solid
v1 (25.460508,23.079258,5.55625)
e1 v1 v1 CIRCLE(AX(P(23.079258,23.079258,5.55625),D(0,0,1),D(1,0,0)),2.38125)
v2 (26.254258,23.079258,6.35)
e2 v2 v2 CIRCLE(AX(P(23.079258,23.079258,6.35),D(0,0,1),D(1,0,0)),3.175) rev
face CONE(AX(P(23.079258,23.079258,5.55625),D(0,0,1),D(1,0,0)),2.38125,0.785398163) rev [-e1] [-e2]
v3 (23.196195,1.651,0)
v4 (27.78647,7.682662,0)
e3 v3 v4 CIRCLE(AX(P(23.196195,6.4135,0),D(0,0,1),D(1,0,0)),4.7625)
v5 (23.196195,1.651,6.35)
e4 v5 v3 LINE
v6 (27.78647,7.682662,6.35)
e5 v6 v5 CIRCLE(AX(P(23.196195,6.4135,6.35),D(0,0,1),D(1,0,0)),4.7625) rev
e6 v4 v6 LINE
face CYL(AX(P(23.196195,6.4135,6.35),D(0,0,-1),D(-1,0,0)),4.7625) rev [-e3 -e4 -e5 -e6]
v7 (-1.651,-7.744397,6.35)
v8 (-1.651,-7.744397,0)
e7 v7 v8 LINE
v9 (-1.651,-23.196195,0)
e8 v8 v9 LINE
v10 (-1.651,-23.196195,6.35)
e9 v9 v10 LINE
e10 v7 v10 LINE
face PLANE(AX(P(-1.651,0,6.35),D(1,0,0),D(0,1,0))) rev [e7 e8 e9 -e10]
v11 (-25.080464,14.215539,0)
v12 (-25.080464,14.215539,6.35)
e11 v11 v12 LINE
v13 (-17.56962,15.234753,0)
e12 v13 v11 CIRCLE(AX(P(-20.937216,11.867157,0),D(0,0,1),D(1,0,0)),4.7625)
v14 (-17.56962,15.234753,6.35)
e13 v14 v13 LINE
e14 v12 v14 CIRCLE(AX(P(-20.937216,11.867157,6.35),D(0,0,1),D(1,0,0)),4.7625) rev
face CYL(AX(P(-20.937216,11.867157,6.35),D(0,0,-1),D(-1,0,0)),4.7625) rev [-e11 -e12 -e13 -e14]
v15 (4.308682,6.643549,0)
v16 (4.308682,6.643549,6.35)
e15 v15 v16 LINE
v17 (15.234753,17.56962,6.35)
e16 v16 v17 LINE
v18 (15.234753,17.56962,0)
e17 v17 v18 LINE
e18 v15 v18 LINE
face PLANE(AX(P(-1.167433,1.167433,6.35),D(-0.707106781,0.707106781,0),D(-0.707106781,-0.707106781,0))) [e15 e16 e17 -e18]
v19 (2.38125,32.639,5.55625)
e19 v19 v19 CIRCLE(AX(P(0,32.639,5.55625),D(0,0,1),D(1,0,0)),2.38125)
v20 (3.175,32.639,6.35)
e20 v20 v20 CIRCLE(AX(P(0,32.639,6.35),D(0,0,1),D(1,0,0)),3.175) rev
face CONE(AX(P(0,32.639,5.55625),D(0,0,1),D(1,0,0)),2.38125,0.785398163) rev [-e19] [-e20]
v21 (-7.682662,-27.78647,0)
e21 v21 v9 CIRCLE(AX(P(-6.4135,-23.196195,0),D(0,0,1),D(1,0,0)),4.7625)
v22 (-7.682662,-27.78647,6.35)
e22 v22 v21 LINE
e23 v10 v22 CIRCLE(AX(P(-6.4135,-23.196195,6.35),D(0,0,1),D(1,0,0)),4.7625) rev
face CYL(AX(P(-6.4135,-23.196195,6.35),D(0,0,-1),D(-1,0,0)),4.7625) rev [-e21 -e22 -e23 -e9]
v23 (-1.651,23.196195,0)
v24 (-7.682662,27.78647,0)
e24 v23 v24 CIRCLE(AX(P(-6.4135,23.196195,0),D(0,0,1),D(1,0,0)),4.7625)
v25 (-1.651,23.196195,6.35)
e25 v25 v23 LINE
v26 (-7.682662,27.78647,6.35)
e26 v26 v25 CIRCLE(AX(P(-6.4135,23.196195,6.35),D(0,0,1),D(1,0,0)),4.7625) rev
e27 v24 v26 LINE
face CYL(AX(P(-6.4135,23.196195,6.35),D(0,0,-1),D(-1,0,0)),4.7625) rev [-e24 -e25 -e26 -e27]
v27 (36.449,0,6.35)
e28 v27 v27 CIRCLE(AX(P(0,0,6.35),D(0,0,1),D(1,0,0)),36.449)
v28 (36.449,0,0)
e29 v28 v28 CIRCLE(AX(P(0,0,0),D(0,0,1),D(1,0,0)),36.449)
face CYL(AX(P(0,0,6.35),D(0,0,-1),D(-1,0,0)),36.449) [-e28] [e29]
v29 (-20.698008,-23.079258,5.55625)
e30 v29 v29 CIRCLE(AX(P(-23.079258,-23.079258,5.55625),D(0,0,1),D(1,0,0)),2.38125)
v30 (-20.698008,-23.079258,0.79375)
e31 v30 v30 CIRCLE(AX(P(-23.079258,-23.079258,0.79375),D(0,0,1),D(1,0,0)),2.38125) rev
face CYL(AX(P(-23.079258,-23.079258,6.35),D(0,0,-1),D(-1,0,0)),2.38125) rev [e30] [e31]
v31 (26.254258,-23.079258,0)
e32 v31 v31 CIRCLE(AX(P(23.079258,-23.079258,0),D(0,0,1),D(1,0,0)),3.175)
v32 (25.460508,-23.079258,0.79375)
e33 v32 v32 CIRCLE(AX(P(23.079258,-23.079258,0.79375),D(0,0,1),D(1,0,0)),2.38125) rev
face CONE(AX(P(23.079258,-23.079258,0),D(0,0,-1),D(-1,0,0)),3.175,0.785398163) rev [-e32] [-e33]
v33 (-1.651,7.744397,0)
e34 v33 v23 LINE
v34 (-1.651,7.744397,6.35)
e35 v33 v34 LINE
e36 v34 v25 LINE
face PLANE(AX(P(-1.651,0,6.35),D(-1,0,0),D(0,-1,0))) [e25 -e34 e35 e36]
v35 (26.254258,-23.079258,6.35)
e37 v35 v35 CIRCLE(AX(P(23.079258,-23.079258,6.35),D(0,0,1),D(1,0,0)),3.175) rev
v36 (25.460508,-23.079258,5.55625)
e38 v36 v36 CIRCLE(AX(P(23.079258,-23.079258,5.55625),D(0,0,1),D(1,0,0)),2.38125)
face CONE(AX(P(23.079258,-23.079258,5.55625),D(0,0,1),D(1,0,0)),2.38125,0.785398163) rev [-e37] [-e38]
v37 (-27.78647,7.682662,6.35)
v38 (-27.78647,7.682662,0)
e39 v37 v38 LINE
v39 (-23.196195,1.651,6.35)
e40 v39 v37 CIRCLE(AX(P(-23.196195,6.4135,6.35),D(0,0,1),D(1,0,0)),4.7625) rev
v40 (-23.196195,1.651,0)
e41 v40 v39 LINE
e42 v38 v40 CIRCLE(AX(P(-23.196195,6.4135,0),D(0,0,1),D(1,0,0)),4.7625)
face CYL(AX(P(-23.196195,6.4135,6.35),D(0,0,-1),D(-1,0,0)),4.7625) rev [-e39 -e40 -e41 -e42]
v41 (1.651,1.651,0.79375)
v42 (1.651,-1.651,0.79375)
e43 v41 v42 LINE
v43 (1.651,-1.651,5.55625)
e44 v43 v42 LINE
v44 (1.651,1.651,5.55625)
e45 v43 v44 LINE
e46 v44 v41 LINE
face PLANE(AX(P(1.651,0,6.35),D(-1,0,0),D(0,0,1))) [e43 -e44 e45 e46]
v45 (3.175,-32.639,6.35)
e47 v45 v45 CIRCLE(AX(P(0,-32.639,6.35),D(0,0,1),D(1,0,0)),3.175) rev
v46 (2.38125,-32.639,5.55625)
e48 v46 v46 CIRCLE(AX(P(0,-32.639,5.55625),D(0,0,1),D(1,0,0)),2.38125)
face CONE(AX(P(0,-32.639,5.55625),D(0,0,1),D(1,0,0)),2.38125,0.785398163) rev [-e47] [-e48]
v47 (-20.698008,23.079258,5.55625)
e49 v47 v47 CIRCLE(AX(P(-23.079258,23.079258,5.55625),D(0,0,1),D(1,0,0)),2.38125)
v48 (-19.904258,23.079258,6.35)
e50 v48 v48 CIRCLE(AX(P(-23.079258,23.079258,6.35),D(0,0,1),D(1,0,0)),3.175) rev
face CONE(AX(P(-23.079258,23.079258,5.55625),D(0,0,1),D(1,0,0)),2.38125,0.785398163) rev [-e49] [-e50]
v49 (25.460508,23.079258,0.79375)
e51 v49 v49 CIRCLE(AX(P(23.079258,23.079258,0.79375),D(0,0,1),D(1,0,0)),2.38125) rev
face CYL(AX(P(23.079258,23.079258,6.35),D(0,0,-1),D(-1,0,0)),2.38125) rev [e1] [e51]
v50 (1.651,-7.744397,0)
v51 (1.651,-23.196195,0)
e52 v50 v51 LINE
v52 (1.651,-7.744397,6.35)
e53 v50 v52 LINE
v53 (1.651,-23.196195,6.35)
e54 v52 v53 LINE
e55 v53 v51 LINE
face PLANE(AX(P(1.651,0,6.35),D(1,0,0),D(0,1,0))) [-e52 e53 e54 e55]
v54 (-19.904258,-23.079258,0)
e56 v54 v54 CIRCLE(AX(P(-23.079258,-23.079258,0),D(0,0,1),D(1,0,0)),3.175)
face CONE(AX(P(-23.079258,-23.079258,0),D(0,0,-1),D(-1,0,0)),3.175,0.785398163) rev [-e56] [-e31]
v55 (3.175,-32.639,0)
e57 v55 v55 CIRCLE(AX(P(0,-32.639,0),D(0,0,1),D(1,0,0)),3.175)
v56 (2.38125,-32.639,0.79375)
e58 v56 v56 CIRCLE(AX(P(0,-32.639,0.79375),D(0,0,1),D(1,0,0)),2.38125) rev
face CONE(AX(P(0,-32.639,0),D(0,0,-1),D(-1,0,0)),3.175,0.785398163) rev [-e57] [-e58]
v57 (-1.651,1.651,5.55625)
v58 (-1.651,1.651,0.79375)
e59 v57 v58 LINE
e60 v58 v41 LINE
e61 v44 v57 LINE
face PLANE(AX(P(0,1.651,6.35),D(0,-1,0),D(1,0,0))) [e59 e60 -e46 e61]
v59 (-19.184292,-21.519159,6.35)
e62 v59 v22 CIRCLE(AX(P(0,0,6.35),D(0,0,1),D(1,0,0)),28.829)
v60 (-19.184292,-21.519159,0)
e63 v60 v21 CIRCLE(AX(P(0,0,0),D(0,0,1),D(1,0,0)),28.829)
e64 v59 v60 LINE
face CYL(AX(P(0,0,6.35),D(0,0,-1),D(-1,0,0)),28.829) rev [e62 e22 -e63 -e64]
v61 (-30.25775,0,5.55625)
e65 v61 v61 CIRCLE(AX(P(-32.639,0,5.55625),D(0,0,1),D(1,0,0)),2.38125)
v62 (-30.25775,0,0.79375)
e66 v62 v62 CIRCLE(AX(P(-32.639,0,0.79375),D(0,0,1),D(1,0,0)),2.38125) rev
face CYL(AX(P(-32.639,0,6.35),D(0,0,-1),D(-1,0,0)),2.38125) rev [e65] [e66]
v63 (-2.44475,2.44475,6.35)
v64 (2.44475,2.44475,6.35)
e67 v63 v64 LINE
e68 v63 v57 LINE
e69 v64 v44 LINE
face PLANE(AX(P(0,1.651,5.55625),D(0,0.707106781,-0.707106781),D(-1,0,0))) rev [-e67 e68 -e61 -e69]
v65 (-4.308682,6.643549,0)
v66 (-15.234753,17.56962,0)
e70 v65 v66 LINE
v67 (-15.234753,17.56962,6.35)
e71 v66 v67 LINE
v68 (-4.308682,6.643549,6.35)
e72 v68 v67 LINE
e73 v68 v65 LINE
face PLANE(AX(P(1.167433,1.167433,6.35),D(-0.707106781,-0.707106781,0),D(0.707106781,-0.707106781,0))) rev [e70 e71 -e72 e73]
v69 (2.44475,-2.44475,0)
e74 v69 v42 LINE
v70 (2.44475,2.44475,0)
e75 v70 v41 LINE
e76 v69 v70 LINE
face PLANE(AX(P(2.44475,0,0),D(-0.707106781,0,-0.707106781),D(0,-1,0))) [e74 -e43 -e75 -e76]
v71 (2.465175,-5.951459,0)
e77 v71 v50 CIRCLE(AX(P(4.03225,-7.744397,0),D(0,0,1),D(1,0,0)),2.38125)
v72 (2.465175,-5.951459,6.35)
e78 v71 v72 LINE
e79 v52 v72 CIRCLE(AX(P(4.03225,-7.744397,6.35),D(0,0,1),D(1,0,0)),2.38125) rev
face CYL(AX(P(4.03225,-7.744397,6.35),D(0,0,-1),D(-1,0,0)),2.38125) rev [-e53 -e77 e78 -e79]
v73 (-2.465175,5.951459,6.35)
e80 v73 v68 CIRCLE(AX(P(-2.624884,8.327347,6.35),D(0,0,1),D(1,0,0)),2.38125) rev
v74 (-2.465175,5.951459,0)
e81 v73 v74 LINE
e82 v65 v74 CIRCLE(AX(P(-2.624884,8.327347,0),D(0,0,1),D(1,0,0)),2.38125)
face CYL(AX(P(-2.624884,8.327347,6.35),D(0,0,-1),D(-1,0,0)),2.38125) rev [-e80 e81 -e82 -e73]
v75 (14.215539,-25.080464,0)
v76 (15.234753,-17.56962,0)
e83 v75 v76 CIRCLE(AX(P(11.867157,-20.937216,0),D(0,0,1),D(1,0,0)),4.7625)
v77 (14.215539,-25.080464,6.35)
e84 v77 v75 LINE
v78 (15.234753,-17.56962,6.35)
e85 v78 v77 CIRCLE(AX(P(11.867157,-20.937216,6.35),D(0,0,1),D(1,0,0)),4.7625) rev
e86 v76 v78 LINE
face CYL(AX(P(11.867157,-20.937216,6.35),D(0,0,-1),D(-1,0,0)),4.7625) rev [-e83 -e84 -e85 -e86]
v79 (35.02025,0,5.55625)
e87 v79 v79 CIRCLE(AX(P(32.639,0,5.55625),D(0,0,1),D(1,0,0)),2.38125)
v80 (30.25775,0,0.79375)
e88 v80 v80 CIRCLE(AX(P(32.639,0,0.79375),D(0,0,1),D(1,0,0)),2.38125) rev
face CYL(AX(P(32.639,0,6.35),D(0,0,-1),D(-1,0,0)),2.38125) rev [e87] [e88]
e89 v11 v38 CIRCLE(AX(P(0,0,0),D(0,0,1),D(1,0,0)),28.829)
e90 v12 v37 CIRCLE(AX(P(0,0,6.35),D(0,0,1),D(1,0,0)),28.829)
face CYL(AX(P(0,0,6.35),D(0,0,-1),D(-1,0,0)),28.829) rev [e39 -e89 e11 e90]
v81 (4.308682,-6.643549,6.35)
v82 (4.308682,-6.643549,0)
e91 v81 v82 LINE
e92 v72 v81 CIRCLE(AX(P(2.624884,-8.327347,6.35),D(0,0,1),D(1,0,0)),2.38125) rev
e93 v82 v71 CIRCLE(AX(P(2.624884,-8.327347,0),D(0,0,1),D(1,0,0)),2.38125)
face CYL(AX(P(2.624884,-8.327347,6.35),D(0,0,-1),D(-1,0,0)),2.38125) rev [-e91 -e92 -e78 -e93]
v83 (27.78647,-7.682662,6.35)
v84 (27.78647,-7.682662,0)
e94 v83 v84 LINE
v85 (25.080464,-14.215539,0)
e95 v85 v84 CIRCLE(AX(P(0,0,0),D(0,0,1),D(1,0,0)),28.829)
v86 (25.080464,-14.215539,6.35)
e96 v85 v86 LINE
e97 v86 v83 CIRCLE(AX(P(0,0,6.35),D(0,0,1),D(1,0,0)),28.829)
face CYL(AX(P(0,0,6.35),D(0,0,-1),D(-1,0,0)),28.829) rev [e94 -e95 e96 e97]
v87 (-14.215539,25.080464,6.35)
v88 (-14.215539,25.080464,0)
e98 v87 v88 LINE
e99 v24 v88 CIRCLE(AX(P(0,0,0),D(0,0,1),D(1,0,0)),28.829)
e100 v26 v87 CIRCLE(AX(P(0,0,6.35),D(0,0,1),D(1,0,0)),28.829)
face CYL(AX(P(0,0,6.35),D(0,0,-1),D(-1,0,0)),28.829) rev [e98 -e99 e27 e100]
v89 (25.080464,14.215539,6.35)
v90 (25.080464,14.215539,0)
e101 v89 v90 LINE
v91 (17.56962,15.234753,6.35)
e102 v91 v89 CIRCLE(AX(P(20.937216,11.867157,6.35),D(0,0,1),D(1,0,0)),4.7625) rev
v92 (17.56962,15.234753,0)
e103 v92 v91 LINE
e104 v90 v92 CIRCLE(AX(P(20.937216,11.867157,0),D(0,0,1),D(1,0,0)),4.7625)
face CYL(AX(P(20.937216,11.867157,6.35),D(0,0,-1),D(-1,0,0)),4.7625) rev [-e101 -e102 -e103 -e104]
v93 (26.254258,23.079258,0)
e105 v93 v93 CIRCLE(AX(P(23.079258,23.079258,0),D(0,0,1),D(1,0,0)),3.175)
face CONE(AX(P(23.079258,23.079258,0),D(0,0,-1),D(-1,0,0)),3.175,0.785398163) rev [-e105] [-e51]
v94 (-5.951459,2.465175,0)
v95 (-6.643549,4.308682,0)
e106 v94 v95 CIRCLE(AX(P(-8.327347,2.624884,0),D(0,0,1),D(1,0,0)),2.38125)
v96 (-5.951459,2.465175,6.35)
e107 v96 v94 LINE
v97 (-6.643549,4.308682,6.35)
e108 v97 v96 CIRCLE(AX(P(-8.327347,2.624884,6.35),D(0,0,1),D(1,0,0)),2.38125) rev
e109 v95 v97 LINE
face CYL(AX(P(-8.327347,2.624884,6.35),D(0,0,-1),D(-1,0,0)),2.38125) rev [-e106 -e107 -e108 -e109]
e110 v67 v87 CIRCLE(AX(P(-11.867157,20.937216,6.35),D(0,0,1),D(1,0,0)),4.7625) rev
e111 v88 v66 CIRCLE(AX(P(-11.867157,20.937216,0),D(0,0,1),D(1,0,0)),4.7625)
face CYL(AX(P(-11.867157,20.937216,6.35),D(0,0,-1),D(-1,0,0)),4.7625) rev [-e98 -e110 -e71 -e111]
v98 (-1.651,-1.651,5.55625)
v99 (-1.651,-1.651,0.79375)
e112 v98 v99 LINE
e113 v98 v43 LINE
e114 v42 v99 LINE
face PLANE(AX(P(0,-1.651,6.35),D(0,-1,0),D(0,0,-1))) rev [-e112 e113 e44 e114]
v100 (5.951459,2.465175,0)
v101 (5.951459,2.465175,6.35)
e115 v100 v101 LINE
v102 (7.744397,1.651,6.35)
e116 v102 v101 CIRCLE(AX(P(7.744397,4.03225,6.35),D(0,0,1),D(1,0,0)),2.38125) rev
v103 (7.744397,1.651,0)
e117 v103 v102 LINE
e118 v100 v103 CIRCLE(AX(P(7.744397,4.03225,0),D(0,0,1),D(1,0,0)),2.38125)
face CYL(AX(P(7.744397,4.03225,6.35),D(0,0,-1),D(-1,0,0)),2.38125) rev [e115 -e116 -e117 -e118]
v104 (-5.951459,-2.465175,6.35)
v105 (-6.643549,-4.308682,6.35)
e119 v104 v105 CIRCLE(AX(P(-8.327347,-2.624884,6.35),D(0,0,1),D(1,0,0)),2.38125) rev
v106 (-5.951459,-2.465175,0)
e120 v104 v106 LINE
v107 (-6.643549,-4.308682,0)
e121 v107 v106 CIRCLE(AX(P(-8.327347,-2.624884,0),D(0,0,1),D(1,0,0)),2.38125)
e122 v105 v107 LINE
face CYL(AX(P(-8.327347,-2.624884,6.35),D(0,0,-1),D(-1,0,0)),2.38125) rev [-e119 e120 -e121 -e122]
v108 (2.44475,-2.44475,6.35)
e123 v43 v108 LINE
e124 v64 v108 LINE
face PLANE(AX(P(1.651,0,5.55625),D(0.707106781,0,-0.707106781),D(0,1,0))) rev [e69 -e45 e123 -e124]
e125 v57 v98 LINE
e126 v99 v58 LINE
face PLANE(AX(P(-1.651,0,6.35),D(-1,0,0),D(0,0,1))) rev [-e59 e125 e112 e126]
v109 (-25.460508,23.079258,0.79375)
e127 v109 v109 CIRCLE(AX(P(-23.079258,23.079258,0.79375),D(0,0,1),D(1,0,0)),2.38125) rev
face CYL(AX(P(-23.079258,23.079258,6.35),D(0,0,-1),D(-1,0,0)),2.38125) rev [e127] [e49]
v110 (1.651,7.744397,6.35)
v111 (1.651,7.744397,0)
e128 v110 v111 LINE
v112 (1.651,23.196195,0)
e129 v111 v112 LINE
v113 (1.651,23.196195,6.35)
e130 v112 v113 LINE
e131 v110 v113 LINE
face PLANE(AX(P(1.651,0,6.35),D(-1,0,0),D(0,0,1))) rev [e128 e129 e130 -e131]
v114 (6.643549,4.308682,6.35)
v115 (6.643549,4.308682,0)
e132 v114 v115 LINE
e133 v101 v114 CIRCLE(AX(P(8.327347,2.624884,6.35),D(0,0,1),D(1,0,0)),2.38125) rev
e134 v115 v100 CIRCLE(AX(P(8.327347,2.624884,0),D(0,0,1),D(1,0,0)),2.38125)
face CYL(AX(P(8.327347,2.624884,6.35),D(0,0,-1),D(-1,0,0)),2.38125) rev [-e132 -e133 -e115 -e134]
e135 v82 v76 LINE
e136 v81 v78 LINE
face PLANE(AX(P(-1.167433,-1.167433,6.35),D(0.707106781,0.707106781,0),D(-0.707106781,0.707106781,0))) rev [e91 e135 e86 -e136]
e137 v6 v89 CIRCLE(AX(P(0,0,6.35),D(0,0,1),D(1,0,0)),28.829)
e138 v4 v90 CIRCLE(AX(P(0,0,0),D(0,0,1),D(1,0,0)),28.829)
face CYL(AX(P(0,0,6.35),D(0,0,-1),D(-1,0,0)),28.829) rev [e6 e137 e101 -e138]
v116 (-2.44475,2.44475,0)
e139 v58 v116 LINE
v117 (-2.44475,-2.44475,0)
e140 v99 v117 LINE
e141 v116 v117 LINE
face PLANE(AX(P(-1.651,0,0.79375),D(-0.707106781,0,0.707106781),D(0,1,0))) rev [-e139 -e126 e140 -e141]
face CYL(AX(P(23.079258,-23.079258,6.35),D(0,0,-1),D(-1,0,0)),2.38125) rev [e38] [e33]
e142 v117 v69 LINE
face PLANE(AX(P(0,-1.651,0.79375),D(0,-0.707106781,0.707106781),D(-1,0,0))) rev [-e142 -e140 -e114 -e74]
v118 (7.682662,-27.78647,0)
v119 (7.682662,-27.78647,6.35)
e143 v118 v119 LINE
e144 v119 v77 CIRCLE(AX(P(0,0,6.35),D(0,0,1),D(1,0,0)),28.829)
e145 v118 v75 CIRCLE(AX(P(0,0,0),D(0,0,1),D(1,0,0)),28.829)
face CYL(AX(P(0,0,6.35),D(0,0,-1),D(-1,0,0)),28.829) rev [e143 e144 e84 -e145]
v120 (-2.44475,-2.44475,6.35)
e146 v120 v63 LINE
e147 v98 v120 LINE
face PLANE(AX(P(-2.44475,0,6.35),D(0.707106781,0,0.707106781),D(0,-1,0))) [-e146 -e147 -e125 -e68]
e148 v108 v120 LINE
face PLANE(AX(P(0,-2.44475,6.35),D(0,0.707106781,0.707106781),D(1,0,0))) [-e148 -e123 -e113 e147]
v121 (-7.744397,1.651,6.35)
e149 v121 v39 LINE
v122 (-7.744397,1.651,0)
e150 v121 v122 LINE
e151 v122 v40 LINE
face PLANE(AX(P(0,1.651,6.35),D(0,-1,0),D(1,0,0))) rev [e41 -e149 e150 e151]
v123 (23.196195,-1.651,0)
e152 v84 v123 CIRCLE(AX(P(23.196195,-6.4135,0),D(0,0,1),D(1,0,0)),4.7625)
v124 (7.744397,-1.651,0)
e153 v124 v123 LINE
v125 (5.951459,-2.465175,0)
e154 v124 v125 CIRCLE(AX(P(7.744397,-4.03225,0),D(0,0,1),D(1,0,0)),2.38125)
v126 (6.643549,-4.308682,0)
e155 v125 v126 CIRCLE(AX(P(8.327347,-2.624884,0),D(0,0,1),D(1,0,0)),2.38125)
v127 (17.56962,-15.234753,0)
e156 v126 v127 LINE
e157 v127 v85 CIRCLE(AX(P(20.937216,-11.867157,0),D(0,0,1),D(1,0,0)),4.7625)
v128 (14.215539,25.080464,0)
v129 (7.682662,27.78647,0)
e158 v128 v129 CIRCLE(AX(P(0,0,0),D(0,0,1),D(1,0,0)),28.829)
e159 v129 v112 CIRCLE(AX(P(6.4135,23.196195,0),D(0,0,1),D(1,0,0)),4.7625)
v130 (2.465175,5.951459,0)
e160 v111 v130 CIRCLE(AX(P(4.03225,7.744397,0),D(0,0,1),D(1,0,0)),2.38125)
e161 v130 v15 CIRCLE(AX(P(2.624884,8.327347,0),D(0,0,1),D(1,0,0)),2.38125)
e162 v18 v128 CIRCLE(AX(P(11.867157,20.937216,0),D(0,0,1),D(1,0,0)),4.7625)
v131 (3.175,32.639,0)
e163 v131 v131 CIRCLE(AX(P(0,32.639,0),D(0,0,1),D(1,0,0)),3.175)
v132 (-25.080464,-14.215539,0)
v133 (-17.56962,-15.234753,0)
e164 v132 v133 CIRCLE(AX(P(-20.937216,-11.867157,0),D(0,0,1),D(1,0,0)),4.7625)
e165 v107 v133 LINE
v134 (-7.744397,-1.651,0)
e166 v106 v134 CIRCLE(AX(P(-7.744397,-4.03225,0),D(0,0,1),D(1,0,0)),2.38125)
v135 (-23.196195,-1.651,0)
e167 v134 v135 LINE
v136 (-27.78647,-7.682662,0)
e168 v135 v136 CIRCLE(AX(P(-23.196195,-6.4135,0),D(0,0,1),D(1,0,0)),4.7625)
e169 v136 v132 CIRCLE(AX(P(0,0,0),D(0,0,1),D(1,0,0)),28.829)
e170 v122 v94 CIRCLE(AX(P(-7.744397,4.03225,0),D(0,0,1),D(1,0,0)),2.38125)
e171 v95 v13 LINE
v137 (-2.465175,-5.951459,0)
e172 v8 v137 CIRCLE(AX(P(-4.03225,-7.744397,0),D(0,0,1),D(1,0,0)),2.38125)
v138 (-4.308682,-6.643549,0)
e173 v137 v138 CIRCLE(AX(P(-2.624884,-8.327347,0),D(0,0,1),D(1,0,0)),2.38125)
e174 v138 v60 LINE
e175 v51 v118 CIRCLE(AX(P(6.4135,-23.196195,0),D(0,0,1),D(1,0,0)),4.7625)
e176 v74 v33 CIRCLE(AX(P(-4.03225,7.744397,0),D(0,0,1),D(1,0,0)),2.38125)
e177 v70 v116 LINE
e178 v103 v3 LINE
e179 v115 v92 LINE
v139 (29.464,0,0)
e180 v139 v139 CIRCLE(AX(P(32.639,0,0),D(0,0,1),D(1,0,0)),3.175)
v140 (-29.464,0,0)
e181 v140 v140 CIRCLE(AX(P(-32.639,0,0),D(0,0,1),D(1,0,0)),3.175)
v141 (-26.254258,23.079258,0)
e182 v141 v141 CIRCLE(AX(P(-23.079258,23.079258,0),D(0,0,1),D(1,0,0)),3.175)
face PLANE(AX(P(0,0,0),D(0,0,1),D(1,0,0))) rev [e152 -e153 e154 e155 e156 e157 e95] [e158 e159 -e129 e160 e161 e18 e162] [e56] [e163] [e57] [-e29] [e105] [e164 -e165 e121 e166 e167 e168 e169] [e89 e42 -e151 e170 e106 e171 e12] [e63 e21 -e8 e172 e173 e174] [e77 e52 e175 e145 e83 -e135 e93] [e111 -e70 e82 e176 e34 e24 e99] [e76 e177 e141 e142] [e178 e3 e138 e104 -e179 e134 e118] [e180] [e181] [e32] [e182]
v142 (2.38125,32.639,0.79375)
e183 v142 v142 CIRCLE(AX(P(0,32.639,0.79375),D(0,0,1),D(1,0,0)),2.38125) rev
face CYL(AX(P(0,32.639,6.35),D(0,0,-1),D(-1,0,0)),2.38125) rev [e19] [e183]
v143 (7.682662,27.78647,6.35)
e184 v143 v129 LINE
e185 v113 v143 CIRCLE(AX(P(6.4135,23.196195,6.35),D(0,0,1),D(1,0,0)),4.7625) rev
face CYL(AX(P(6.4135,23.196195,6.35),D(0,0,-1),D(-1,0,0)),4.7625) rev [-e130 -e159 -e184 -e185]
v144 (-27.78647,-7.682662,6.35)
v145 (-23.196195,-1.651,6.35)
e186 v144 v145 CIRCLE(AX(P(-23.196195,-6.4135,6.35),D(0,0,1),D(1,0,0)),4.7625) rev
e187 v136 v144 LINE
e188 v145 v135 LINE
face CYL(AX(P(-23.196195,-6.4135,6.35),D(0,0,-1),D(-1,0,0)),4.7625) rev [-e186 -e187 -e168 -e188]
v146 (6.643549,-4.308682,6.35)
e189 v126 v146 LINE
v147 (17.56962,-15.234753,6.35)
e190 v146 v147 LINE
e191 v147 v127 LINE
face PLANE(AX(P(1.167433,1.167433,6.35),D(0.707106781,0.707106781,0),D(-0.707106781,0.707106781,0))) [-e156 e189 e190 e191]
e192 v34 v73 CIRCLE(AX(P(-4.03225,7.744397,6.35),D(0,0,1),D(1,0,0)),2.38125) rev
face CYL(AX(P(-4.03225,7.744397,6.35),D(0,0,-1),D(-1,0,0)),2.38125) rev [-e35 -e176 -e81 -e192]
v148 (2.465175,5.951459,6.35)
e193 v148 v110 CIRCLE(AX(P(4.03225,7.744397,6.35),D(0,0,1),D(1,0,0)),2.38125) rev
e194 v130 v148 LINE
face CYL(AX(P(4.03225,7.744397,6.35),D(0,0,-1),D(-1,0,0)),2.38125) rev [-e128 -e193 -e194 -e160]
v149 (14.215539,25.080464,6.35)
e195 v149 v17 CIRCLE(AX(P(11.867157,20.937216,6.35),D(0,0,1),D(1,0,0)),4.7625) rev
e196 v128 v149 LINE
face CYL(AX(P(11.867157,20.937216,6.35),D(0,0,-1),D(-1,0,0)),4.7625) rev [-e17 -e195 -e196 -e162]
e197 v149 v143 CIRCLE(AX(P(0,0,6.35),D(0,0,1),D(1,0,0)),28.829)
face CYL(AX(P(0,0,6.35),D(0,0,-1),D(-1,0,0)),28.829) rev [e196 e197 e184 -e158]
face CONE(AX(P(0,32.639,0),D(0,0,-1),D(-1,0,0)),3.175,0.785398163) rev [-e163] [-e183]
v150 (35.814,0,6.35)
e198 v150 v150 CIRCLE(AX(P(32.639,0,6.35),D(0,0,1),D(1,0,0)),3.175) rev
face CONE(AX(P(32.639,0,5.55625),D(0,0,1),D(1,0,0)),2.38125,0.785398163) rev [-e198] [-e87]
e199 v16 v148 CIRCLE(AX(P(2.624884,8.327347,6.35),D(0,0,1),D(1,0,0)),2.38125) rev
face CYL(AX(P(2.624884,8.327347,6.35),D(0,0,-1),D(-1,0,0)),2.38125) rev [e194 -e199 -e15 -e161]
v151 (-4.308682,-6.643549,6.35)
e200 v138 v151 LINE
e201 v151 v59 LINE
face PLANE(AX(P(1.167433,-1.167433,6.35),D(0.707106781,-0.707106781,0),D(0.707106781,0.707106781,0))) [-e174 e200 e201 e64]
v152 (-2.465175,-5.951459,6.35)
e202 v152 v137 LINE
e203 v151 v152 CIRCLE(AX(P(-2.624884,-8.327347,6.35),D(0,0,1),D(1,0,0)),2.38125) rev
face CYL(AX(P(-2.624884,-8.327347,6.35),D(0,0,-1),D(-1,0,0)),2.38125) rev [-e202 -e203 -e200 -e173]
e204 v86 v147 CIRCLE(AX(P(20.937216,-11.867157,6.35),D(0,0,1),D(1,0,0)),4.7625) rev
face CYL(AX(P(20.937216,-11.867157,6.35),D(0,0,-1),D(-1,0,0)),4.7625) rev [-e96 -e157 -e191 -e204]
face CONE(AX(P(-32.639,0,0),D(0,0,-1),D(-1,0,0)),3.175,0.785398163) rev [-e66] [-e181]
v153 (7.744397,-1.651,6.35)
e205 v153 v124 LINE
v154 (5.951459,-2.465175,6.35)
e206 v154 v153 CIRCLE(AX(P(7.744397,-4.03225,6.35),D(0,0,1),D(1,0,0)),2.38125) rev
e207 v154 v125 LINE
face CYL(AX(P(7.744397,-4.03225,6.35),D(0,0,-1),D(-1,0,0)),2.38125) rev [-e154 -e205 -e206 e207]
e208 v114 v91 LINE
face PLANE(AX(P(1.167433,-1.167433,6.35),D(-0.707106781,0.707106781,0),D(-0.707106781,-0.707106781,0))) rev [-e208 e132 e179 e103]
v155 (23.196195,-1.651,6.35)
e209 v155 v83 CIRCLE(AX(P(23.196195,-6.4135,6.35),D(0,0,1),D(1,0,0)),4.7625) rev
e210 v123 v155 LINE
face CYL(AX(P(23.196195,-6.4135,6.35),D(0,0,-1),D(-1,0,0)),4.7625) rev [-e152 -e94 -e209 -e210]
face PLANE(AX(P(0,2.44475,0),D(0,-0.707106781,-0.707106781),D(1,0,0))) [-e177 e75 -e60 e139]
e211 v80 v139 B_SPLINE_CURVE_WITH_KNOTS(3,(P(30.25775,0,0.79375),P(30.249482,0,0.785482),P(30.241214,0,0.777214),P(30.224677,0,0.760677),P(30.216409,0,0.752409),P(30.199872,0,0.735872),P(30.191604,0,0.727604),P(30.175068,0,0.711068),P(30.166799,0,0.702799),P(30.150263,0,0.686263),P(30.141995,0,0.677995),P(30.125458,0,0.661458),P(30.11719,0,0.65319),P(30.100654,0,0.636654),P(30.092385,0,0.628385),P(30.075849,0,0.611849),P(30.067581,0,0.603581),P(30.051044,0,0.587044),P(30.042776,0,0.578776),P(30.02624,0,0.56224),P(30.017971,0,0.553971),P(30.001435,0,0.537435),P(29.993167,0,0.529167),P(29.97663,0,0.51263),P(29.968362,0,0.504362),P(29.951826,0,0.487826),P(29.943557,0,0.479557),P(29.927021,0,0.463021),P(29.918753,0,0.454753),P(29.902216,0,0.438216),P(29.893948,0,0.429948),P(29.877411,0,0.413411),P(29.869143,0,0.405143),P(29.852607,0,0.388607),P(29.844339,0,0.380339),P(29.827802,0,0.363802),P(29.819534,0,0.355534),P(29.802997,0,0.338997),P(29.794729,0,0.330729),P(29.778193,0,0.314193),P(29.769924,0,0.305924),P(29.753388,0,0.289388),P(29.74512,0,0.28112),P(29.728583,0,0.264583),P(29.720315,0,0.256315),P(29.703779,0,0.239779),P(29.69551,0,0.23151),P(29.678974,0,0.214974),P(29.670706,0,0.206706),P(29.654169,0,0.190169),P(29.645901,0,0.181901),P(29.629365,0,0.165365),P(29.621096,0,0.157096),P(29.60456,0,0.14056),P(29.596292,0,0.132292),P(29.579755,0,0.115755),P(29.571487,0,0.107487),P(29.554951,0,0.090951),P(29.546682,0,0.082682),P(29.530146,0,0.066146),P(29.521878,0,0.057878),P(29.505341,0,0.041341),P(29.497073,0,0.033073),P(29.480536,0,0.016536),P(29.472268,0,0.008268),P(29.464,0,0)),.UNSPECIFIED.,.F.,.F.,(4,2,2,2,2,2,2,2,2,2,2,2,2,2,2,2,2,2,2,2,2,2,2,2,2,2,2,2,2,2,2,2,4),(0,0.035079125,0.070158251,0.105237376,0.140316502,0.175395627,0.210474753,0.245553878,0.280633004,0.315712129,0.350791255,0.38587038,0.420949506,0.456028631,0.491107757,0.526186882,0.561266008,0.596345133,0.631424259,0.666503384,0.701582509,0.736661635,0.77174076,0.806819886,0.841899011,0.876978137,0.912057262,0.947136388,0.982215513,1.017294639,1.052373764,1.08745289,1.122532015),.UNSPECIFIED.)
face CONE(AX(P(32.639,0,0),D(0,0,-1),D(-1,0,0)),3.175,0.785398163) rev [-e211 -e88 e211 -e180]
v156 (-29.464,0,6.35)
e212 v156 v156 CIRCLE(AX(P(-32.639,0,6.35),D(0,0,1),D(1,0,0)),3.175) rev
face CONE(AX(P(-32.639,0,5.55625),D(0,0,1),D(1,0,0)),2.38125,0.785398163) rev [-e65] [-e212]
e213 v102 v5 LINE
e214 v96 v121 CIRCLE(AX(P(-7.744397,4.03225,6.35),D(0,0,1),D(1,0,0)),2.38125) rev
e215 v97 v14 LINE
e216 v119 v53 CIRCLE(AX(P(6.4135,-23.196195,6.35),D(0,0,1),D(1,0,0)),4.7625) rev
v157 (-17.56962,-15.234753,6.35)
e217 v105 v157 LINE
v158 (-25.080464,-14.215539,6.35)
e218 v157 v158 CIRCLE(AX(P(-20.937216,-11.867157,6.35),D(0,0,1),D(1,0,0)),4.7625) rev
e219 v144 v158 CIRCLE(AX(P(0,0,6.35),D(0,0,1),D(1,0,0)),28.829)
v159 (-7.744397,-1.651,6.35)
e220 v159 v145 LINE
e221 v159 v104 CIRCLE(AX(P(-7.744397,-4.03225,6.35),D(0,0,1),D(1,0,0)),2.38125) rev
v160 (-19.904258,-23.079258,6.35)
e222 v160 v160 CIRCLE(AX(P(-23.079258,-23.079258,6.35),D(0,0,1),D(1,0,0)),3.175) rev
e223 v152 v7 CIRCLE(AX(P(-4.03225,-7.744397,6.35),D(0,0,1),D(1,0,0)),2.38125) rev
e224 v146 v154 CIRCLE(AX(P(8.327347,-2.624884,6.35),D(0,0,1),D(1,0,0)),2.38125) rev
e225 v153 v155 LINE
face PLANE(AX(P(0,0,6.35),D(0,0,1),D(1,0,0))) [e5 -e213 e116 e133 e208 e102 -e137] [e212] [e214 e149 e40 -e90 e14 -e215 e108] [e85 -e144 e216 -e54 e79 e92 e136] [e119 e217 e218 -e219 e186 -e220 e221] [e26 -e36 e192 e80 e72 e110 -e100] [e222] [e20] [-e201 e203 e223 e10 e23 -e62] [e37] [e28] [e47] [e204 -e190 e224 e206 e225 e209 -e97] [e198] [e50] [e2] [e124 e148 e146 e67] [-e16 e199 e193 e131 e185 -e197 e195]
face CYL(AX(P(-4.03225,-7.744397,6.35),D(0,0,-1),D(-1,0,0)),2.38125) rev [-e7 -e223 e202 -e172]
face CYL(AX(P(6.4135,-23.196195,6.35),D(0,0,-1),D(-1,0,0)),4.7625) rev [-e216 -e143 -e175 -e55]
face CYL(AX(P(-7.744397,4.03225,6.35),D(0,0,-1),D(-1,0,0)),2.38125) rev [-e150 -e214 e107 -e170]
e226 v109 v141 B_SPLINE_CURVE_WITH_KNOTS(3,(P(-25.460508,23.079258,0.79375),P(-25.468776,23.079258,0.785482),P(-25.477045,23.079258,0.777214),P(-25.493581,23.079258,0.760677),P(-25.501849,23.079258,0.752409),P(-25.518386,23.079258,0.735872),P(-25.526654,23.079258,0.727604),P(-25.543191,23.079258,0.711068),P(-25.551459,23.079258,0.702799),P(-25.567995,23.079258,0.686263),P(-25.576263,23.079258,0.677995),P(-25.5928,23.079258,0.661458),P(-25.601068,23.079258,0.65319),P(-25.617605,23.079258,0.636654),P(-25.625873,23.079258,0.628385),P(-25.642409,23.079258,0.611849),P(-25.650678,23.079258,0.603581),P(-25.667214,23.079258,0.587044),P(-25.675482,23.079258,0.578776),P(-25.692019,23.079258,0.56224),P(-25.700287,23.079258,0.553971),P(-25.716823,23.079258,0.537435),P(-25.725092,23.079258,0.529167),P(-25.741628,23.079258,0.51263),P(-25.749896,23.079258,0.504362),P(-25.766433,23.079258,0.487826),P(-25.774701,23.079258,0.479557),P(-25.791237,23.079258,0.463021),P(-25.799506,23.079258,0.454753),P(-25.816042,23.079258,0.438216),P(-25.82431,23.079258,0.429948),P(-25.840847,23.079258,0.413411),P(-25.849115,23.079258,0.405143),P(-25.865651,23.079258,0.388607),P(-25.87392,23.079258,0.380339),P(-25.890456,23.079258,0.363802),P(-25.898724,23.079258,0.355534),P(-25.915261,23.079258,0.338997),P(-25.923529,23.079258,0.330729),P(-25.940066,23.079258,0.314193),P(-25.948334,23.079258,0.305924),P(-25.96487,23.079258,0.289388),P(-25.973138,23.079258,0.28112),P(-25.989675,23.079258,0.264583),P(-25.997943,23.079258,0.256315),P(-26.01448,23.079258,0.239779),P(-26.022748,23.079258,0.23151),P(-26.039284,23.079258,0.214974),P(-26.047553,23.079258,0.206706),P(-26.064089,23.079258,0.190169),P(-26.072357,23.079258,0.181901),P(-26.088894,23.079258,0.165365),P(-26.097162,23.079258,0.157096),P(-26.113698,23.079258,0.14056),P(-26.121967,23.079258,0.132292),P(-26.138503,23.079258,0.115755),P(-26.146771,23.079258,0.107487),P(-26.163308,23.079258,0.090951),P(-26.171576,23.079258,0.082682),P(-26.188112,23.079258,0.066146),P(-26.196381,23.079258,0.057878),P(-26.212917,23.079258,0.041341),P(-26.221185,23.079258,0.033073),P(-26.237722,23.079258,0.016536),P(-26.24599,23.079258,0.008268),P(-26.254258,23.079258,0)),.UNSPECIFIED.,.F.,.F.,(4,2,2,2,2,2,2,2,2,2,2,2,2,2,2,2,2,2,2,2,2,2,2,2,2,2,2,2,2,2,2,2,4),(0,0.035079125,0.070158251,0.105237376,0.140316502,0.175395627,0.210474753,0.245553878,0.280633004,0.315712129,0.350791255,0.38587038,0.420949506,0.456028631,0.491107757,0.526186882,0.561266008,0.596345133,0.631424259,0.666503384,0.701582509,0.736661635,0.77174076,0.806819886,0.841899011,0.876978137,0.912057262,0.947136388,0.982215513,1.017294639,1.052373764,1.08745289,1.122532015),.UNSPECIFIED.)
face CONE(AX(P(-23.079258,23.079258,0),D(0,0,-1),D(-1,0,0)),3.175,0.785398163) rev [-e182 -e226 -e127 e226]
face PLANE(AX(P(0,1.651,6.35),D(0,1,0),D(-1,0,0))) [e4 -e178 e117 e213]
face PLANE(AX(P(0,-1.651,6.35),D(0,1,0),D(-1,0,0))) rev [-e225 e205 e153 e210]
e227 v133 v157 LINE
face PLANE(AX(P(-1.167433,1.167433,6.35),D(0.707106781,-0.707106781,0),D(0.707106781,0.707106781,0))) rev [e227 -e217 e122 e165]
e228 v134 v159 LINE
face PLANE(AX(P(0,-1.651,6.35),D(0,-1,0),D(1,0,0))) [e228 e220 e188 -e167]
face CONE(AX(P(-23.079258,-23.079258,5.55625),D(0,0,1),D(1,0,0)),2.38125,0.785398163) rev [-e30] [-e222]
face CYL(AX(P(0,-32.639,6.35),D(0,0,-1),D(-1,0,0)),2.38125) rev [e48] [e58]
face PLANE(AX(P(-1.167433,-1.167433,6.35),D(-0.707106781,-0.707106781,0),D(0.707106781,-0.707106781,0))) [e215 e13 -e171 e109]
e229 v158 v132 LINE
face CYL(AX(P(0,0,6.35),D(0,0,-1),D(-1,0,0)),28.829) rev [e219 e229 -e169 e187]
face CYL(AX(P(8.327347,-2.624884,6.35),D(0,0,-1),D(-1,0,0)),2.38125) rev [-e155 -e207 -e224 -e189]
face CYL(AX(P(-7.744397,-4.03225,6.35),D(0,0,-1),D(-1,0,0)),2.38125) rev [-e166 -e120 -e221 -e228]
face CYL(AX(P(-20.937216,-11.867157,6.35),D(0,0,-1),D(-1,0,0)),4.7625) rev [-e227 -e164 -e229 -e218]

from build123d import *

# Parameters (mm, degrees)
SKETCH1_R           = 36.449
SKETCH1_W           = 3.302
SKETCH1_H           = 3.302
SKETCH1_R_2         = 2.38125
BOSS_EXTRUDE1_DEPTH = 6.35
FILLET1_R           = 4.7625
FILLET2_R           = 2.38125
CHAMFER1_SIZE       = 0.79375


with BuildPart() as part:
    # Sketch1 → Boss-Extrude1 (new body)
    with BuildSketch(Plane.XY):
        Circle(SKETCH1_R)
        with BuildLine():
            Line((-1.651, 28.781685844), (-1.651, 6.131614714))
            ThreePointArc((-1.651, 6.131614714), (-2.430039796, 5.866635031), (-3.168273048, 5.50313964))
            Line((-3.168273048, 5.50313964), (-19.184291938, 21.51915853))
            ThreePointArc((-19.184291938, 21.51915853), (-11.032380672, 26.634523043), (-1.651, 28.781685844))
        make_face(mode=Mode.SUBTRACT)
        with BuildLine():
            Line((-21.51915853, 19.184291938), (-5.50313964, 3.168273048))
            ThreePointArc((-5.50313964, 3.168273048), (-5.866635031, 2.430039796), (-6.131614714, 1.651))
            Line((-6.131614714, 1.651), (-28.781685844, 1.651))
            ThreePointArc((-28.781685844, 1.651), (-26.634523043, 11.032380672), (-21.51915853, 19.184291938))
        make_face(mode=Mode.SUBTRACT)
        with BuildLine():
            Line((-28.781685844, -1.651), (-6.131614714, -1.651))
            ThreePointArc((-6.131614714, -1.651), (-5.866635031, -2.430039796), (-5.50313964, -3.168273048))
            Line((-5.50313964, -3.168273048), (-21.51915853, -19.184291938))
            ThreePointArc((-21.51915853, -19.184291938), (-26.634523043, -11.032380672), (-28.781685844, -1.651))
        make_face(mode=Mode.SUBTRACT)
        with BuildLine():
            Line((-19.184291938, -21.51915853), (-3.168273048, -5.50313964))
            ThreePointArc((-3.168273048, -5.50313964), (-2.430039796, -5.866635031), (-1.651, -6.131614714))
            Line((-1.651, -6.131614714), (-1.651, -28.781685844))
            ThreePointArc((-1.651, -28.781685844), (-11.032380672, -26.634523043), (-19.184291938, -21.51915853))
        make_face(mode=Mode.SUBTRACT)
        with BuildLine():
            Line((1.651, -28.781685844), (1.651, -6.131614714))
            ThreePointArc((1.651, -6.131614714), (2.430039796, -5.866635031), (3.168273048, -5.50313964))
            Line((3.168273048, -5.50313964), (19.184291938, -21.51915853))
            ThreePointArc((19.184291938, -21.51915853), (11.032380672, -26.634523043), (1.651, -28.781685844))
        make_face(mode=Mode.SUBTRACT)
        with BuildLine():
            Line((21.51915853, -19.184291938), (5.50313964, -3.168273048))
            ThreePointArc((5.50313964, -3.168273048), (5.866635031, -2.430039796), (6.131614714, -1.651))
            Line((6.131614714, -1.651), (28.781685844, -1.651))
            ThreePointArc((28.781685844, -1.651), (26.634523043, -11.032380672), (21.51915853, -19.184291938))
        make_face(mode=Mode.SUBTRACT)
        with BuildLine():
            Line((28.781685844, 1.651), (6.131614714, 1.651))
            ThreePointArc((6.131614714, 1.651), (5.866635031, 2.430039796), (5.50313964, 3.168273048))
            Line((5.50313964, 3.168273048), (21.51915853, 19.184291938))
            ThreePointArc((21.51915853, 19.184291938), (26.634523043, 11.032380672), (28.781685844, 1.651))
        make_face(mode=Mode.SUBTRACT)
        with BuildLine():
            Line((19.184291938, 21.51915853), (3.168273048, 5.50313964))
            ThreePointArc((3.168273048, 5.50313964), (2.430039796, 5.866635031), (1.651, 6.131614714))
            Line((1.651, 6.131614714), (1.651, 28.781685844))
            ThreePointArc((1.651, 28.781685844), (11.032380672, 26.634523043), (19.184291938, 21.51915853))
        make_face(mode=Mode.SUBTRACT)
        Rectangle(SKETCH1_W, SKETCH1_H, mode=Mode.SUBTRACT)
        with Locations((-23.079258231, -23.079258231)):
            Circle(SKETCH1_R_2, mode=Mode.SUBTRACT)
        with Locations((-32.639, 0)):
            Circle(SKETCH1_R_2, mode=Mode.SUBTRACT)
        with Locations((0, -32.639)):
            Circle(SKETCH1_R_2, mode=Mode.SUBTRACT)
        with Locations((23.079258231, -23.079258231)):
            Circle(SKETCH1_R_2, mode=Mode.SUBTRACT)
        with Locations((-23.079258231, 23.079258231)):
            Circle(SKETCH1_R_2, mode=Mode.SUBTRACT)
        with Locations((23.079258231, 23.079258231)):
            Circle(SKETCH1_R_2, mode=Mode.SUBTRACT)
        with Locations((0, 32.639)):
            Circle(SKETCH1_R_2, mode=Mode.SUBTRACT)
        with Locations((32.639, 0)):
            Circle(SKETCH1_R_2, mode=Mode.SUBTRACT)
    extrude(amount=BOSS_EXTRUDE1_DEPTH)

    # Fillet1
    fillet1_edges = [part.edges().sort_by_distance(p)[0] for p in [
        (21.51915853, 19.184291938, 3.175),
        (28.781685844, 1.651, 3.175),
        (19.184291938, 21.51915853, 3.175),
        (1.651, 28.781685844, 3.175),
        (-1.651, 28.781685844, 3.175),
        (-19.184291938, 21.51915853, 3.175),
        (-21.51915853, 19.184291938, 3.175),
        (-28.781685844, 1.651, 3.175),
        (-28.781685844, -1.651, 3.175),
        (-21.51915853, -19.184291938, 3.175),
        (-1.651, -28.781685844, 3.175),
        (1.651, -28.781685844, 3.175),
        (19.184291938, -21.51915853, 3.175),
        (21.51915853, -19.184291938, 3.175),
        (28.781685844, -1.651, 3.175),
    ]]
    fillet(fillet1_edges, radius=FILLET1_R)

    # Fillet2
    # the kernel refuses this fillet: 2.38125 mm, written as the material it adds along each edge
    with BuildSketch(Plane(origin=(6.131614714, -1.651, 0), x_dir=(-0.36304434778587014, -0.931771861316241, 0), z_dir=(0, 0, 1)), Plane(origin=(1.651, 6.131614714, 0), x_dir=(0.9317718613162208, -0.36304434778592154, 0), z_dir=(0, 0, 1)), Plane(origin=(5.50313964, 3.168273048, 0), x_dir=(0.40215108146465606, -0.9155733218463759, 0), z_dir=(0, 0, 1)), Plane(origin=(-6.131614714, 1.651, 0), x_dir=(0.3630443477859294, 0.9317718613162179, 0), z_dir=(0, 0, 1))) as fillet2_piece_1:
        with BuildLine():
            CenterArc((1.633270214, 2.367244602), FILLET2_R, 201.287277983, 62.495506179)
            Line((-0.585511531, 1.502745249), (0, 0))
            ThreePointArc((0, 0), (0.687692722, 0.037347727), (1.375385443, 0))
        make_face()
    extrude(amount=6.35)
    with BuildSketch(Plane(origin=(5.50313964, -3.168273048, 0), x_dir=(0.7071067811865454, -0.7071067811865497, 0), z_dir=(0, 0, 1)), Plane(origin=(3.168273048, 5.50313964, 0), x_dir=(0.7071067811865503, 0.7071067811865448, 0), z_dir=(0, 0, 1)), Plane(origin=(6.131614714, 1.651, 0), x_dir=(1, 0, 0), z_dir=(0, 0, 1)), Plane(origin=(-1.651, 6.131614714, 0), x_dir=(0, 1, 0), z_dir=(0, 0, 1)), Plane(origin=(-5.50313964, 3.168273048, 0), x_dir=(-0.7071067811865499, 0.7071067811865452, 0), z_dir=(0, 0, 1)), Plane(origin=(-6.131614714, -1.651, 0), x_dir=(-1, 0, 0), z_dir=(0, 0, 1)), Plane(origin=(1.651, -6.131614714, 0), x_dir=(0, -1, 0), z_dir=(0, 0, 1))) as fillet2_piece_2:
        with BuildLine():
            CenterArc((1.61278239, 2.38125), FILLET2_R, 207.504493821, 62.495506179)
            ThreePointArc((-0.499325911, 1.281545455), (-0.214863395, 0.654331608), (0, 0))
            Line((0, 0), (1.61278239, 0))
        make_face()
    extrude(amount=6.35)
    with BuildSketch(Plane(origin=(3.168273048, -5.50313964, 0), x_dir=(0.7071067811865439, -0.7071067811865511, 0), z_dir=(0, 0, 1)), Plane(origin=(-3.168273048, 5.50313964, 0), x_dir=(-0.7071067811865503, 0.7071067811865448, 0), z_dir=(0, 0, 1)), Plane(origin=(-5.50313964, -3.168273048, 0), x_dir=(-0.7071067811865455, -0.7071067811865496, 0), z_dir=(0, 0, 1)), Plane(origin=(-1.651, -6.131614714, 0), x_dir=(0, -1, 0), z_dir=(0, 0, 1))) as fillet2_piece_3:
        with BuildLine():
            CenterArc((1.61278239, -2.38125), FILLET2_R, 90, 62.495506179)
            ThreePointArc((-0.499325911, -1.281545455), (-0.214863395, -0.654331608), (0, 0))
            Line((0, 0), (1.61278239, 0))
        make_face()
    extrude(amount=6.35)
    with BuildSketch(Plane(origin=(-3.168273048, -5.50313964, 0), x_dir=(0.9155733218463795, -0.40215108146464806, 0), z_dir=(0, 0, 1))) as fillet2_piece_4:
        with BuildLine():
            CenterArc((1.633270214, -2.367244602), FILLET2_R, 96.217215838, 62.495506179)
            Line((-0.585511531, -1.502745249), (0, 0))
            ThreePointArc((0, 0), (0.687692722, -0.037347727), (1.375385443, 0))
        make_face()
    extrude(amount=6.35)

    # Chamfer1
    chamfer1_edges = [part.edges().sort_by_distance(p)[0] for p in [
        (-25.460508231, 23.079258231, 6.35),
        (-35.02025, 0, 6.35),
        (-25.460508231, -23.079258231, 6.35),
        (-2.38125, -32.639, 6.35),
        (20.698008231, -23.079258231, 6.35),
        (30.25775, 0, 6.35),
        (20.698008231, 23.079258231, 6.35),
        (-2.38125, 32.639, 6.35),
        (0, -1.651, 6.35),
        (-1.651, 0, 6.35),
        (0, 1.651, 6.35),
        (1.651, 0, 6.35),
        (1.651, 0, 0),
        (0, 1.651, 0),
        (-1.651, 0, 0),
        (0, -1.651, 0),
        (-2.38125, 32.639, 0),
        (20.698008231, 23.079258231, 0),
        (30.25775, 0, 0),
        (20.698008231, -23.079258231, 0),
        (-2.38125, -32.639, 0),
        (-25.460508231, -23.079258231, 0),
        (-35.02025, 0, 0),
        (-25.460508231, 23.079258231, 0),
    ]]
    chamfer(chamfer1_edges, length=CHAMFER1_SIZE)


solid = part.part
